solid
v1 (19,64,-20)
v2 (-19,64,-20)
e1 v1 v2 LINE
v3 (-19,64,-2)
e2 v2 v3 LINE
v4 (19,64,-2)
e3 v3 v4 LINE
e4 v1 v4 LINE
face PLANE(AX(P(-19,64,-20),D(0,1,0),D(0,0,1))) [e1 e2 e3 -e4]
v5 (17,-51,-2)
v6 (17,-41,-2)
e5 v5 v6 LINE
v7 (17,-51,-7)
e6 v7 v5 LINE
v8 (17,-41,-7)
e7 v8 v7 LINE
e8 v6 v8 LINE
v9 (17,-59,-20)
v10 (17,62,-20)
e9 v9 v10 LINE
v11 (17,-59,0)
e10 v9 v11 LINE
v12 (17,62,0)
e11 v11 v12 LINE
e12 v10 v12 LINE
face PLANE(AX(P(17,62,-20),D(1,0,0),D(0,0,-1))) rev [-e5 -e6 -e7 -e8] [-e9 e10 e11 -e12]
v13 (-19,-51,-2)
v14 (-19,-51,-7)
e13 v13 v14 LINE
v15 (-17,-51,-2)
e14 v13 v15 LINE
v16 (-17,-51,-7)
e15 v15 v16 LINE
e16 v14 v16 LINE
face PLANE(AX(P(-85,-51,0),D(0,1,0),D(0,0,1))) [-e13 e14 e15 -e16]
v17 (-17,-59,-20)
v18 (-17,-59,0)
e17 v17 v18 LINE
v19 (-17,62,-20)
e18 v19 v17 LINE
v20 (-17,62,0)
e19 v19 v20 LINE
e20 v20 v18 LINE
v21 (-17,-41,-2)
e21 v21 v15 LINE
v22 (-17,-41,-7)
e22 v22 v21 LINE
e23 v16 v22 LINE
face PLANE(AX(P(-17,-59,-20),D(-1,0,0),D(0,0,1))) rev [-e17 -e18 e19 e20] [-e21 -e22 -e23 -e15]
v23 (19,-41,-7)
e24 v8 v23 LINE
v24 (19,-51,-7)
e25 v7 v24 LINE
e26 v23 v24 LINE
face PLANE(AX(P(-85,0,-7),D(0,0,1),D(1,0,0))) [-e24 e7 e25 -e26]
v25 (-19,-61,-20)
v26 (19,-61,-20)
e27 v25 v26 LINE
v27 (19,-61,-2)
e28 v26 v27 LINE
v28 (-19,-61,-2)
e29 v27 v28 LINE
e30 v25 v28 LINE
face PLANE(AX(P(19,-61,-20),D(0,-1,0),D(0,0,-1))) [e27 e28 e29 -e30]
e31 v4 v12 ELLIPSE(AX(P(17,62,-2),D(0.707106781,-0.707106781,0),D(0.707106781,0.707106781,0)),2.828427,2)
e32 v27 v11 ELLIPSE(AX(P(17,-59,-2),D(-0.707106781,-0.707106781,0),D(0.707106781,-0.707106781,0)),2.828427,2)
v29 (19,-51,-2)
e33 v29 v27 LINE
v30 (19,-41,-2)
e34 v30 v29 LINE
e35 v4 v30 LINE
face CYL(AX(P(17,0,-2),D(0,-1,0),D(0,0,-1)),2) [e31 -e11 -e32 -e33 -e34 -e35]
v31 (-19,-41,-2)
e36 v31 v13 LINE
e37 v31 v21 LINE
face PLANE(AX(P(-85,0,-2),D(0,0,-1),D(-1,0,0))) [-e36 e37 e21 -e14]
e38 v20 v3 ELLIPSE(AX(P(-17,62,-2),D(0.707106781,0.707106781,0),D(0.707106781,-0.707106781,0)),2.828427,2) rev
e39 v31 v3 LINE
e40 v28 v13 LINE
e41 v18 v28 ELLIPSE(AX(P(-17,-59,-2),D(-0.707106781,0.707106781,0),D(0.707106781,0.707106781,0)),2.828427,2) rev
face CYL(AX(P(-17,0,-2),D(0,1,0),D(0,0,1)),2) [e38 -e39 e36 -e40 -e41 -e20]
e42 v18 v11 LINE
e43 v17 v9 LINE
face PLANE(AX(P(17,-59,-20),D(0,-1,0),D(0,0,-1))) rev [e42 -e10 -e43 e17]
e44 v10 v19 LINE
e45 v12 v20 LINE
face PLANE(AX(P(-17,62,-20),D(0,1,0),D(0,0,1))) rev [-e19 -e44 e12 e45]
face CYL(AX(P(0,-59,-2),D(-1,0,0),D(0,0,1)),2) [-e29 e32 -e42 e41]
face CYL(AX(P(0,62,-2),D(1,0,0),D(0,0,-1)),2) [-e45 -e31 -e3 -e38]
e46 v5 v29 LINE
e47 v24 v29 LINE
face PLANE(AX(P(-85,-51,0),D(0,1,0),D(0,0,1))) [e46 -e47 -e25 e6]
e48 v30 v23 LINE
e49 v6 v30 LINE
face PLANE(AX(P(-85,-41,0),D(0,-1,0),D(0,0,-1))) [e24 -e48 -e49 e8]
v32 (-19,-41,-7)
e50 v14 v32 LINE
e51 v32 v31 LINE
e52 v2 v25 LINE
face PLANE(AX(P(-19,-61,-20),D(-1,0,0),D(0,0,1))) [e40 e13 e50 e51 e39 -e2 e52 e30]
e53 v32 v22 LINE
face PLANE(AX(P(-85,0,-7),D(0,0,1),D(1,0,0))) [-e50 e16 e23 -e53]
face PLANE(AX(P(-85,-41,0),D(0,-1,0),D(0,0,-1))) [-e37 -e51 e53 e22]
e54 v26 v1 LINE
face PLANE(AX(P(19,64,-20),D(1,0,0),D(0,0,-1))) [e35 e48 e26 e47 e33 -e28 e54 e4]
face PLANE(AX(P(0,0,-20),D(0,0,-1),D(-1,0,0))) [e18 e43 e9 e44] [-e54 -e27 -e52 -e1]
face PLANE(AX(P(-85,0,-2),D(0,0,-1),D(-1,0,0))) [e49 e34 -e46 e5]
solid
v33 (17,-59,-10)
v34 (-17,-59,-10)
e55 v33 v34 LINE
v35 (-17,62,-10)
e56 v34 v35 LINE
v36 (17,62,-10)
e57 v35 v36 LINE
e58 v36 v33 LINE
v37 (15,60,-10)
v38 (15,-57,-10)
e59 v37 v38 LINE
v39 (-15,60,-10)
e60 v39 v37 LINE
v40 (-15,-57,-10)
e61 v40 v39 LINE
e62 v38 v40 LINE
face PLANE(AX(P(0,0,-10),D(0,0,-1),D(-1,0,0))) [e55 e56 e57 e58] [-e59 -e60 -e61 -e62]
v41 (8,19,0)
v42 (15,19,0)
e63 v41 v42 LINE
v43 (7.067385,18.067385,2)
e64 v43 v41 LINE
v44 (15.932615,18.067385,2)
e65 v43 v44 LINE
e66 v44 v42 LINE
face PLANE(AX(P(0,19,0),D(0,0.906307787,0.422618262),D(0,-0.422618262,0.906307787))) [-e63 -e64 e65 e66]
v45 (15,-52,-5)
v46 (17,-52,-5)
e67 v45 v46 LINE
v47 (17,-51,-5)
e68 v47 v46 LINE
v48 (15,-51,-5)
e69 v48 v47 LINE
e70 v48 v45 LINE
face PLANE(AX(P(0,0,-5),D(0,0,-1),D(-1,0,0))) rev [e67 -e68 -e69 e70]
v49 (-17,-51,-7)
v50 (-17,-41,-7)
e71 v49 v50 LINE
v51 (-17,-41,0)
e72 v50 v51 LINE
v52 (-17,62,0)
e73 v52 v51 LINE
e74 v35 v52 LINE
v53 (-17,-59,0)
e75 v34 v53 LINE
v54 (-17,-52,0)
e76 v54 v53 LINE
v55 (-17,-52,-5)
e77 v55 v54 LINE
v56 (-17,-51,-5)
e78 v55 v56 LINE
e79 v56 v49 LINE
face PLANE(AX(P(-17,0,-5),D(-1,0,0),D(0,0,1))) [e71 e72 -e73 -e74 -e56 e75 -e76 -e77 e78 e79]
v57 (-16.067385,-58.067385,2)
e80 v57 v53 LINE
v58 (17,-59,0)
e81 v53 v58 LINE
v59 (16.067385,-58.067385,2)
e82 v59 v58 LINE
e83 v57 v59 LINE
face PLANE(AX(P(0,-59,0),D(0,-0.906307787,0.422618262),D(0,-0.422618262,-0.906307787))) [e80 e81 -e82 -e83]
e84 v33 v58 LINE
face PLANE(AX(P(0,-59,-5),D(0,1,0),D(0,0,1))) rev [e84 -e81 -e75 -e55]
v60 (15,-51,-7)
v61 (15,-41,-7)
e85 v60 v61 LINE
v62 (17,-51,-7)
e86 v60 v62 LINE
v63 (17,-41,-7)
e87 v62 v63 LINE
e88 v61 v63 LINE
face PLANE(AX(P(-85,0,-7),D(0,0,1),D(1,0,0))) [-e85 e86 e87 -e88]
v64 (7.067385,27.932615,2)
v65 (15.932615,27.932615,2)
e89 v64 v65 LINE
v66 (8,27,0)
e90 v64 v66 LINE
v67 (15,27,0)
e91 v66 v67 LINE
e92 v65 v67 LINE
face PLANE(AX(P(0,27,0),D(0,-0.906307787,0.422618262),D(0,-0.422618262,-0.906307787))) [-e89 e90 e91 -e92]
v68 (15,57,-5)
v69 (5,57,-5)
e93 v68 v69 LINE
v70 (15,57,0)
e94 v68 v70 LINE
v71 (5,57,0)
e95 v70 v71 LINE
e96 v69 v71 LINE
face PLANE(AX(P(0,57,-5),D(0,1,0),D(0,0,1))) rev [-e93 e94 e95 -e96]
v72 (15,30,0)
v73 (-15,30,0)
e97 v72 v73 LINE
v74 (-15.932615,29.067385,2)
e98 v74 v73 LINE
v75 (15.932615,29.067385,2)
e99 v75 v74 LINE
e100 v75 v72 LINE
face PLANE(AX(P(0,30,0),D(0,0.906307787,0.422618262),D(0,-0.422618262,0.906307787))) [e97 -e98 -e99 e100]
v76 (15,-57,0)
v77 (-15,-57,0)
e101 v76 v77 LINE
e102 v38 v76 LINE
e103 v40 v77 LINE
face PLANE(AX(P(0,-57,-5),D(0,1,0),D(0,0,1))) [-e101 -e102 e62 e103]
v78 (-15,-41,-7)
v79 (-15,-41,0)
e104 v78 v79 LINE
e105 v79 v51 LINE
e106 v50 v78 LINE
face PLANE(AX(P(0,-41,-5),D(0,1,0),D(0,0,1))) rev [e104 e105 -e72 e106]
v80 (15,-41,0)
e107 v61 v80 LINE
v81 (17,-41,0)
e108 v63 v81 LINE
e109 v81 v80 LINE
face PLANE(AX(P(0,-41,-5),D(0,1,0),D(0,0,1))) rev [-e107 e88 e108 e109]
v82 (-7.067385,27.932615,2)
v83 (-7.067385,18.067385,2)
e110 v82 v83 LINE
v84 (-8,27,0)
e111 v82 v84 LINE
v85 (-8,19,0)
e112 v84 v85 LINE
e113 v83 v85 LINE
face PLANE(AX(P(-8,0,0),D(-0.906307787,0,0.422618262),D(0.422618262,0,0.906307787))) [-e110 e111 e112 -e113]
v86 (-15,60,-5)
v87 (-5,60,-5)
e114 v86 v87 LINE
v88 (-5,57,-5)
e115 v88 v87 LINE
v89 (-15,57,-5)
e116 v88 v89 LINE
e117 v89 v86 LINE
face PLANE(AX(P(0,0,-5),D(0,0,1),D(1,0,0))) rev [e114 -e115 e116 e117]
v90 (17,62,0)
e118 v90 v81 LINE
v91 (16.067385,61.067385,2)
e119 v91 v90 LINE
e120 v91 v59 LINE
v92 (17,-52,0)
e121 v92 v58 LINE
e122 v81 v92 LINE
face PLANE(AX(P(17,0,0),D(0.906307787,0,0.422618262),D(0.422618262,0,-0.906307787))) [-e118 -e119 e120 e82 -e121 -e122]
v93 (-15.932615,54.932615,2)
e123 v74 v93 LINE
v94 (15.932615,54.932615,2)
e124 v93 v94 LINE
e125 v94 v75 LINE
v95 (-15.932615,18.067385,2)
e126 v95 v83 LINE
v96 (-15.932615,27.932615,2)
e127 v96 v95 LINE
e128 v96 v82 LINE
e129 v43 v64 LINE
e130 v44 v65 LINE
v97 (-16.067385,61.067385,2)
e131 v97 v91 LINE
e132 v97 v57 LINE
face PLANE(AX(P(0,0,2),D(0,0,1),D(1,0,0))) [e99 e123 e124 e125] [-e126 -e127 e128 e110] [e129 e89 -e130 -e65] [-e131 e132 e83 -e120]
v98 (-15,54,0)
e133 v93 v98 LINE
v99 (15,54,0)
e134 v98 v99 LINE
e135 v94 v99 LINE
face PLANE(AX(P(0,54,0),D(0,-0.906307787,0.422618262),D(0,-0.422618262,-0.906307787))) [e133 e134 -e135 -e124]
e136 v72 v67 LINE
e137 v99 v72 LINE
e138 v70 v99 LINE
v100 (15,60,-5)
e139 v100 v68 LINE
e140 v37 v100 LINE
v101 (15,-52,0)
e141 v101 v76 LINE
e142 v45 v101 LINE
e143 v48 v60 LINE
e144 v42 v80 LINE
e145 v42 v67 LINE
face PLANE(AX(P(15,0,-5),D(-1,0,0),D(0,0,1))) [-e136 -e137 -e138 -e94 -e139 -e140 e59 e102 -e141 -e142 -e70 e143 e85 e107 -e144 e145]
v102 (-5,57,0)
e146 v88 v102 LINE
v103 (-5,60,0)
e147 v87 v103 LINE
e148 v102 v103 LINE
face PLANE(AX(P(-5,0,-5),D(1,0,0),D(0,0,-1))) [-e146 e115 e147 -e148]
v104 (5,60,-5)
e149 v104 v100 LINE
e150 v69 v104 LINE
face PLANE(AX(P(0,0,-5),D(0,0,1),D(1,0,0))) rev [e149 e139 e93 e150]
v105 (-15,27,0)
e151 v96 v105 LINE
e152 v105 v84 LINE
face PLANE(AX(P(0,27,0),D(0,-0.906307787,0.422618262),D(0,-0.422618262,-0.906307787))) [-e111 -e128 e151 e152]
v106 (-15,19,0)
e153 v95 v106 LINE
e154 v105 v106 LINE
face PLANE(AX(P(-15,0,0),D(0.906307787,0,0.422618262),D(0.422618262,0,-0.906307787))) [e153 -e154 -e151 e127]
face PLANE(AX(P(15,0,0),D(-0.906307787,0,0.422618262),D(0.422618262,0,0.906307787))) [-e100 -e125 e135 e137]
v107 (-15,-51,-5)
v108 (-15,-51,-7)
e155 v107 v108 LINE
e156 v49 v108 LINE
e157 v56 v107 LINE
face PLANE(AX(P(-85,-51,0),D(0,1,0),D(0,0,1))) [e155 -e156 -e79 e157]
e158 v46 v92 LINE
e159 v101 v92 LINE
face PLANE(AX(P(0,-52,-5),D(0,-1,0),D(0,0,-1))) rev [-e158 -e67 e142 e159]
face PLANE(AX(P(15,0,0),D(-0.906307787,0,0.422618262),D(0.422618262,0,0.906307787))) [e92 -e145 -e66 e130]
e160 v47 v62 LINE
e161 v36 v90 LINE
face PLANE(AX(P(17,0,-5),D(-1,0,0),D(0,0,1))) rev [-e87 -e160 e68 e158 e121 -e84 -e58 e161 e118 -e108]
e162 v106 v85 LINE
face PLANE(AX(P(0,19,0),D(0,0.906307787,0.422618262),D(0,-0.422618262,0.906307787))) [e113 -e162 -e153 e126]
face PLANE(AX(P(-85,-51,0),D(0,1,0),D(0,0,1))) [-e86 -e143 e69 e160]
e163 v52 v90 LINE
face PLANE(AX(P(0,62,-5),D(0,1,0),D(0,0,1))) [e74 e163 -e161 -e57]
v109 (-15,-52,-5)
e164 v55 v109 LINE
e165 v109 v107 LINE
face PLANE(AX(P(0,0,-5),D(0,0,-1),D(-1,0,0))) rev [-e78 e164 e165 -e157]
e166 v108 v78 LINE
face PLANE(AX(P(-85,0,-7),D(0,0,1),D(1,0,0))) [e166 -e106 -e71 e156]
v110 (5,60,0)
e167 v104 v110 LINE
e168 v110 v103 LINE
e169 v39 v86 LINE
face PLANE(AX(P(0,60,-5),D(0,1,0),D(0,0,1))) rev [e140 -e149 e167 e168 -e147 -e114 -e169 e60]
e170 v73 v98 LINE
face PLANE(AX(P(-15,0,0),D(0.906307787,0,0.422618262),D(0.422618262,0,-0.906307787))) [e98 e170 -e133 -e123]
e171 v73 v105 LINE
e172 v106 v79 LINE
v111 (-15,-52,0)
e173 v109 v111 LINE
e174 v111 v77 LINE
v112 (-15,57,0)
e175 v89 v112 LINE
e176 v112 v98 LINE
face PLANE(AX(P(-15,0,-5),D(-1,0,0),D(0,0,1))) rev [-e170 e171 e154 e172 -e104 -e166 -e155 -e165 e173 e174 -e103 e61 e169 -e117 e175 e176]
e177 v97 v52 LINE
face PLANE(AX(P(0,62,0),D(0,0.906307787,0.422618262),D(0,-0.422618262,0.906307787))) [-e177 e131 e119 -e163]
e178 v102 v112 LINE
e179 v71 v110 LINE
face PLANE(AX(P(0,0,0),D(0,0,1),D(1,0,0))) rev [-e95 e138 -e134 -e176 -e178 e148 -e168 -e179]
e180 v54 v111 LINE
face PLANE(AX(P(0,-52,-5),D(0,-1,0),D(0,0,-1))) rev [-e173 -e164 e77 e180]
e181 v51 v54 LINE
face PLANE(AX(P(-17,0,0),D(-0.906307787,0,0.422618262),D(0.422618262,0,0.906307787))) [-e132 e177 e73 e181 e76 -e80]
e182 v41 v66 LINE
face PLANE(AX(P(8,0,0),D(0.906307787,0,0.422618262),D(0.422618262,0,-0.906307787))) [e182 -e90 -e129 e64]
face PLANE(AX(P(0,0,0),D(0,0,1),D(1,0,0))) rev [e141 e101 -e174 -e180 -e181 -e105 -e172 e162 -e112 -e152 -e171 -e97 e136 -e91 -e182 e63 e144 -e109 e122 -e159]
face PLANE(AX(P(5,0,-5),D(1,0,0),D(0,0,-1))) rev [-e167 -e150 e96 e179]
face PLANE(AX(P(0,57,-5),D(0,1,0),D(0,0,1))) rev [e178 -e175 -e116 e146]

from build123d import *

# Parameters (mm, degrees)
ESBO_O2_W                = 34
ESBO_O2_H                = 121
ESBO_O2_W_2              = 7
ESBO_O2_H_2              = 8
RESSALTO_EXTRUS_O1_DEPTH = 2
RESSALTO_EXTRUS_O1_DRAFT = 25
ESBO_O3_W                = 10
ESBO_O3_H                = 3
RESSALTO_EXTRUS_O2_DEPTH = 5
ESBO_O4_W                = 34
ESBO_O4_H                = 121
ESBO_O4_W_2              = 30
ESBO_O4_H_2              = 117
RESSALTO_EXTRUS_O3_DEPTH = 5
ESBO_O5_W                = 38
ESBO_O5_H                = 125
ESBO_O5_W_2              = 34
ESBO_O5_H_2              = 121
RESSALTO_EXTRUS_O5_DEPTH = 20
FILETE1_R                = 2
ESBO_O6_W                = 5
ESBO_O6_H                = 10
CORTE_EXTRUS_O1_DEPTH    = 66


with BuildPart() as part:
    # Esboço2 → Ressalto-extrusão1 (with draft: the straight prism first)
    with BuildSketch(Plane.XY):
        with Locations((0, 1.5)):
            Rectangle(ESBO_O2_W, ESBO_O2_H)
        with Locations((-11.5, 23)):
            Rectangle(ESBO_O2_W_2, ESBO_O2_H_2, mode=Mode.SUBTRACT)
        with Locations((11.5, 23)):
            Rectangle(ESBO_O2_W_2, ESBO_O2_H_2, mode=Mode.SUBTRACT)
        Polygon((8, 30), (-8, 30), (-15, 30), (-15, 54), (15, 54), (15, 30), align=None, mode=Mode.SUBTRACT)
    extrude(amount=RESSALTO_EXTRUS_O1_DEPTH)
    # Ressalto-extrusão1: the draft: its side faces are tilted about the plane it starts from
    ressalto_extrus_o1_sides = [part.faces().sort_by_distance(p)[0] for p in [
        (0, 62, 1),
        (15, 42, 1),
        (0, 54, 1),
        (-15, 42, 1),
        (0, 30, 1),
        (11.5, 19, 1),
        (15, 23, 1),
        (11.5, 27, 1),
        (8, 23, 1),
        (-15, 23, 1),
        (-11.5, 19, 1),
        (-8, 23, 1),
        (-11.5, 27, 1),
        (0, -59, 1),
        (-17, 1.5, 1),
        (17, 1.5, 1),
    ]]
    draft(ressalto_extrus_o1_sides, Plane.XY, RESSALTO_EXTRUS_O1_DRAFT)

    # Esboço3 → Ressalto-extrusão2 (add)
    with BuildSketch(Plane.XY):
        Polygon((15, -41), (17, -41), (17, 62), (-17, 62), (-17, -41), (-15, -41), (-15, 57), (-15, 60), (-5, 60), (5, 60), (15, 60), (15, 57), align=None)
        with Locations((10, 58.5)):
            Rectangle(ESBO_O3_W, ESBO_O3_H)
        with Locations((-10, 58.5)):
            Rectangle(ESBO_O3_W, ESBO_O3_H)
        Polygon((17, -59), (17, -52), (15, -52), (15, -57), (-15, -57), (-15, -52), (-17, -52), (-17, -59), align=None)
    extrude(amount=-RESSALTO_EXTRUS_O2_DEPTH)

    # Esboço4 → Ressalto-extrusão3 (add)
    with BuildSketch(Plane(origin=(0, 0, -5), x_dir=(-1, 0, 0), z_dir=(0, 0, -1))):
        with Locations((0, 1.5)):
            Rectangle(ESBO_O4_W, ESBO_O4_H)
        with Locations((0, 1.5)):
            Rectangle(ESBO_O4_W_2, ESBO_O4_H_2, mode=Mode.SUBTRACT)
    extrude(amount=RESSALTO_EXTRUS_O3_DEPTH)


with BuildPart() as body_2:
    # Esboço5 → Ressalto-extrusão5 (new body)
    with BuildSketch(Plane.XY):
        with Locations((0, 1.5)):
            Rectangle(ESBO_O5_W, ESBO_O5_H)
        with Locations((0, 1.5)):
            Rectangle(ESBO_O5_W_2, ESBO_O5_H_2, mode=Mode.SUBTRACT)
    extrude(amount=-RESSALTO_EXTRUS_O5_DEPTH)

    # Filete1
    filete1_edges = [body_2.edges().sort_by_distance(p)[0] for p in [
        (-19, 1.5, 0),
        (0, 64, 0),
        (19, 1.5, 0),
        (0, -61, 0),
    ]]
    fillet(filete1_edges, radius=FILETE1_R - 0.0001)  # a hair under: the kernel refuses the full size


with BuildPart() as corte_extrus_o1_tool:
    # Esboço6 → Corte-extrusão1 (new, symmetric)
    with BuildSketch(Plane.ZY.offset(19)):
        with Locations((-4.5, -46)):
            Rectangle(ESBO_O6_W, ESBO_O6_H)
    extrude(amount=CORTE_EXTRUS_O1_DEPTH, both=True)


with BuildPart() as part_1:
    add(part.part)

    # Corte-extrusão1: cut by corte_extrus_o1_tool
    add(corte_extrus_o1_tool.part, mode=Mode.SUBTRACT)


with BuildPart() as body_2_1:
    add(body_2.part)

    # Corte-extrusão1: cut by corte_extrus_o1_tool
    add(corte_extrus_o1_tool.part, mode=Mode.SUBTRACT)


solid = Compound([part_1.part, body_2_1.part])
